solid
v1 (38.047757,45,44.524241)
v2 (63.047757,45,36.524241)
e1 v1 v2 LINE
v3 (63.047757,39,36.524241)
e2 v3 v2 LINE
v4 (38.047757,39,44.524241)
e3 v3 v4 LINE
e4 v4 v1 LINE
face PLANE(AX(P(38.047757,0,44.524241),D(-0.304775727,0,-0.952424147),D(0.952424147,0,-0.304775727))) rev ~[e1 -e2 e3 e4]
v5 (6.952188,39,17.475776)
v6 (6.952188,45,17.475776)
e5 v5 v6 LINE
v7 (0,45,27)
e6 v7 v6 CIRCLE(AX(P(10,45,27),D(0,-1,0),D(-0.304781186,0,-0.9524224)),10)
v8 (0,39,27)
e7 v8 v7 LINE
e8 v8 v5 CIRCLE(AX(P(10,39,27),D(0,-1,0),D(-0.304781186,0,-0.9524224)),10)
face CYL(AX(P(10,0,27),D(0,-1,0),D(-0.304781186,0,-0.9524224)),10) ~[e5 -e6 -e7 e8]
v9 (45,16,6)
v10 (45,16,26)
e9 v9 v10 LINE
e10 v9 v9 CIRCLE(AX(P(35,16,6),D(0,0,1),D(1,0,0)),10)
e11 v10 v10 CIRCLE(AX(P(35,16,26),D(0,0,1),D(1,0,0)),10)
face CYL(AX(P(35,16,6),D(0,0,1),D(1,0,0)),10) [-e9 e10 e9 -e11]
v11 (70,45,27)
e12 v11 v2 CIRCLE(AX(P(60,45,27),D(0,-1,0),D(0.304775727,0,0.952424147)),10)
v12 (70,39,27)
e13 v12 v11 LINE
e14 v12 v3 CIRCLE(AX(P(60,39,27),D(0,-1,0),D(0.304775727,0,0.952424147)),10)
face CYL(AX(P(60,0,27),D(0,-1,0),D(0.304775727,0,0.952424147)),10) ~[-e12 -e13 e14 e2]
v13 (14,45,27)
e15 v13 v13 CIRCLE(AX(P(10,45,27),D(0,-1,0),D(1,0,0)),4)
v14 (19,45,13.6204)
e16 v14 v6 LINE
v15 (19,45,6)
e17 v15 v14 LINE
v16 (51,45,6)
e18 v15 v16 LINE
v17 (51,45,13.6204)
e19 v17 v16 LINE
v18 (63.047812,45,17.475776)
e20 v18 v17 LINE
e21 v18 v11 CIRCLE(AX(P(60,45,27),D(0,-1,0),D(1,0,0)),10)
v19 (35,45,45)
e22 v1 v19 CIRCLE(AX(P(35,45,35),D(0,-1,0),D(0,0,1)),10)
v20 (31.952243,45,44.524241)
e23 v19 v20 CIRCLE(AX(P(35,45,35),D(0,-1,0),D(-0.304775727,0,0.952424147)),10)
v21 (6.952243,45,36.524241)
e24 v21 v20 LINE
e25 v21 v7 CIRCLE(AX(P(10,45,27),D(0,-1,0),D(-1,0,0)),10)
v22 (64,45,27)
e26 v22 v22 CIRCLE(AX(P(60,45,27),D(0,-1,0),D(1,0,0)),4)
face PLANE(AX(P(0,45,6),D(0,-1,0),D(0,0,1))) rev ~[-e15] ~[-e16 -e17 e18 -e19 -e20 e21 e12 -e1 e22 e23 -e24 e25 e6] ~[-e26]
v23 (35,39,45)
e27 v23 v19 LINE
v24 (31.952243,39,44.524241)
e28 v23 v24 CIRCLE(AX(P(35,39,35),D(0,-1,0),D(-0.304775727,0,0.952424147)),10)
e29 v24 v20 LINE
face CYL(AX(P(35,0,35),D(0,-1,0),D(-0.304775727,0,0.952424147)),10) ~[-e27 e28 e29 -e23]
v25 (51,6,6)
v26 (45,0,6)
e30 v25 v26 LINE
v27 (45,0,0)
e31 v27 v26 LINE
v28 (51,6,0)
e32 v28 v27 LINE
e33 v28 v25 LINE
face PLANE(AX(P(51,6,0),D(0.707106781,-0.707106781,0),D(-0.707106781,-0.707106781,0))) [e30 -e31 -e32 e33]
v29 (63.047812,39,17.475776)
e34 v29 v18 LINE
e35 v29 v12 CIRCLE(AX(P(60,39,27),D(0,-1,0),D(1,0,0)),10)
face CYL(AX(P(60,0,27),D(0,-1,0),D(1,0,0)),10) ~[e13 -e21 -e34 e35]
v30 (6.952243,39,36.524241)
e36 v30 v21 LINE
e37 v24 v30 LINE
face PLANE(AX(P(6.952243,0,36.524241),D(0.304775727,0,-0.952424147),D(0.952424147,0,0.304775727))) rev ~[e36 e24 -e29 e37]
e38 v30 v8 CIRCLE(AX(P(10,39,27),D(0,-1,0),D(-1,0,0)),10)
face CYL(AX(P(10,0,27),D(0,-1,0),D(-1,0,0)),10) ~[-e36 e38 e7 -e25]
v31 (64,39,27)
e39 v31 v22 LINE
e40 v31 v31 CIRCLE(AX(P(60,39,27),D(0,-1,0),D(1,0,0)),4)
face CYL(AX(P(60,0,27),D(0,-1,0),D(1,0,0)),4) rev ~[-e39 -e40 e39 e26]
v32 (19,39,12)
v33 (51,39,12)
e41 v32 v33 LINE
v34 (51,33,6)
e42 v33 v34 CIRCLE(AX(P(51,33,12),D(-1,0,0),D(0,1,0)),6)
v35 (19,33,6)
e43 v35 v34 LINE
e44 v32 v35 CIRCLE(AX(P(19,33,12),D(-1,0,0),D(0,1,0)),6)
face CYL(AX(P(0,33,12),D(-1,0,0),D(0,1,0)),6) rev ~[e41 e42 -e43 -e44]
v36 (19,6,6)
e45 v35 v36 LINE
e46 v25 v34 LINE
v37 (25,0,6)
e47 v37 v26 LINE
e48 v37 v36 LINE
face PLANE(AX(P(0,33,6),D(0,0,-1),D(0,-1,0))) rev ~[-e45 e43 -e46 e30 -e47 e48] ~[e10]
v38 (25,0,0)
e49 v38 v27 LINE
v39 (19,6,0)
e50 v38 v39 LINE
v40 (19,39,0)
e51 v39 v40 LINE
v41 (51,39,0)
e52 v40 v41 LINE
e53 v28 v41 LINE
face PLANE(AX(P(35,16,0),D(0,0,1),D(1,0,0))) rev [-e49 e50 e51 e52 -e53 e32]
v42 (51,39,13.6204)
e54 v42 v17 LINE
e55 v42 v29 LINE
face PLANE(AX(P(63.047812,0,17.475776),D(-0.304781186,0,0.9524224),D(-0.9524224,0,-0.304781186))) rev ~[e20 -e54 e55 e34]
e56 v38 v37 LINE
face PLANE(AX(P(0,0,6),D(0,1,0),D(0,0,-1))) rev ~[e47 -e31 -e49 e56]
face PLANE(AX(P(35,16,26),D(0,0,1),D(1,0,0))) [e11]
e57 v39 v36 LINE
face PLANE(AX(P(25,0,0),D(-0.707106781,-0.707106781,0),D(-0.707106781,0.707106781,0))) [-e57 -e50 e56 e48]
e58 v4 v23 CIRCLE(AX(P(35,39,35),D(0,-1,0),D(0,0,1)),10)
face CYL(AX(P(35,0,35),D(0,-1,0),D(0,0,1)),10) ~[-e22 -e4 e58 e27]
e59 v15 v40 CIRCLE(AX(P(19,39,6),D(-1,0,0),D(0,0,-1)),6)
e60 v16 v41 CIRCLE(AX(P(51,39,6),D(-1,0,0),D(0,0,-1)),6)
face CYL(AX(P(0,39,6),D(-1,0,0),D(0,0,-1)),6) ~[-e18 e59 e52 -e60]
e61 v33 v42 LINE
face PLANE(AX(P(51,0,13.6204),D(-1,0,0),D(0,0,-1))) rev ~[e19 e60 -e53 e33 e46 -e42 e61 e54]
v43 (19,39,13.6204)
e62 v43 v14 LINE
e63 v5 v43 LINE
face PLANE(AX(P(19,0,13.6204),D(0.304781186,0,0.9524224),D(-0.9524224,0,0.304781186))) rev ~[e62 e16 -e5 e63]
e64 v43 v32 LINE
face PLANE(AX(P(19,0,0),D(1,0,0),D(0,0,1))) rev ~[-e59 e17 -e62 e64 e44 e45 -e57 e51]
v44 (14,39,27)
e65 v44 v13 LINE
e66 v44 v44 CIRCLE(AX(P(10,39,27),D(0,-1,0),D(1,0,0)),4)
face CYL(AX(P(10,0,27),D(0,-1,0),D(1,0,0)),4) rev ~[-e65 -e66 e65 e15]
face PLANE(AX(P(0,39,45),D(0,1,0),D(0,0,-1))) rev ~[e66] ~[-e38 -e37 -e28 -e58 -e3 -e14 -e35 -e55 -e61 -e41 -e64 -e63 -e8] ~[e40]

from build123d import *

# Parameters (mm, degrees)
F1_DEPTH = 70
F2_R     = 4
F3_DEPTH = 45.001
F4_R     = 8
F5_DEPTH = 45.001


with BuildPart() as f1:
    # F0 (on Right) → F1 (new body)
    with BuildSketch(Plane.YZ):
        with BuildLine():
            Line((0, 6), (0, 0))
            Line((0, 0), (39, 0))
            ThreePointArc((39, 0), (43.2426406871, 1.7573593129), (45, 6))
            Line((45, 6), (45, 45))
            Line((45, 45), (39, 45))
            Line((39, 45), (39, 12))
            ThreePointArc((39, 12), (37.2426406871, 7.7573593129), (33, 6))
            Line((33, 6), (0, 6))
        make_face()
    extrude(amount=F1_DEPTH)

    # F2 (on Front) → F3 (cut, through all)
    with BuildSketch(Plane.XZ):
        with Locations((10, 27)):
            Circle(F2_R)
        with Locations((60, 27)):
            Circle(F2_R)
        with BuildLine():
            ThreePointArc((63.047757271, 36.524241472), (68.0770530737, 32.8958641135), (70, 27))
            Line((70, 27), (70, 45))
            Line((70, 45), (35, 45))
            ThreePointArc((35, 45), (36.5423335048, 44.880344496), (38.047757271, 44.524241472))
            Line((38.047757271, 44.524241472), (63.047757271, 36.524241472))
        make_face()
        with BuildLine():
            Line((51, 13.620400082), (51, 0))
            Line((51, 0), (70, 0))
            Line((70, 0), (70, 27))
            ThreePointArc((70, 27), (68.0770699689, 21.1041590322), (63.0478118565, 17.4757759955))
            Line((63.0478118565, 17.4757759955), (51, 13.620400082))
        make_face()
        with BuildLine():
            Line((0, 0), (19, 0))
            Line((19, 0), (19, 13.620400082))
            Line((19, 13.620400082), (6.9521881435, 17.4757759955))
            ThreePointArc((6.9521881435, 17.4757759955), (1.922930031, 21.1041590323), (0, 27.0000000001))
            Line((0, 27.0000000001), (0, 0))
        make_face()
        with BuildLine():
            Line((0, 45), (0, 27.0000000001))
            ThreePointArc((0, 27.0000000001), (1.9229469263, 32.8958641136), (6.952242729, 36.524241472))
            Line((6.952242729, 36.524241472), (31.952242729, 44.524241472))
            ThreePointArc((31.952242729, 44.524241472), (33.4576664952, 44.880344496), (35, 45))
            Line((35, 45), (0, 45))
        make_face()
    extrude(amount=-F3_DEPTH, mode=Mode.SUBTRACT)

    # F4 (on Top) → F5 (cut, through all)
    with BuildSketch(Plane.XY):
        with Locations((35, 16)):
            Circle(F4_R)
        Polygon((19, 0), (25, 0), (19, 6), align=None)
        Polygon((45, 0), (51, 0), (51, 6), align=None)
    extrude(amount=F5_DEPTH, mode=Mode.SUBTRACT)

    # F7 (on offset) → F8 (revolve)
    with BuildSketch(Plane.XZ.offset(-16)):
        Polygon((35, 26), (35, 0), (43, 0), (43, 6), (45, 6), (45, 26), align=None)
    revolve(axis=Axis((35, 16, 13), (0, 0, 1)))


solid = f1.part
